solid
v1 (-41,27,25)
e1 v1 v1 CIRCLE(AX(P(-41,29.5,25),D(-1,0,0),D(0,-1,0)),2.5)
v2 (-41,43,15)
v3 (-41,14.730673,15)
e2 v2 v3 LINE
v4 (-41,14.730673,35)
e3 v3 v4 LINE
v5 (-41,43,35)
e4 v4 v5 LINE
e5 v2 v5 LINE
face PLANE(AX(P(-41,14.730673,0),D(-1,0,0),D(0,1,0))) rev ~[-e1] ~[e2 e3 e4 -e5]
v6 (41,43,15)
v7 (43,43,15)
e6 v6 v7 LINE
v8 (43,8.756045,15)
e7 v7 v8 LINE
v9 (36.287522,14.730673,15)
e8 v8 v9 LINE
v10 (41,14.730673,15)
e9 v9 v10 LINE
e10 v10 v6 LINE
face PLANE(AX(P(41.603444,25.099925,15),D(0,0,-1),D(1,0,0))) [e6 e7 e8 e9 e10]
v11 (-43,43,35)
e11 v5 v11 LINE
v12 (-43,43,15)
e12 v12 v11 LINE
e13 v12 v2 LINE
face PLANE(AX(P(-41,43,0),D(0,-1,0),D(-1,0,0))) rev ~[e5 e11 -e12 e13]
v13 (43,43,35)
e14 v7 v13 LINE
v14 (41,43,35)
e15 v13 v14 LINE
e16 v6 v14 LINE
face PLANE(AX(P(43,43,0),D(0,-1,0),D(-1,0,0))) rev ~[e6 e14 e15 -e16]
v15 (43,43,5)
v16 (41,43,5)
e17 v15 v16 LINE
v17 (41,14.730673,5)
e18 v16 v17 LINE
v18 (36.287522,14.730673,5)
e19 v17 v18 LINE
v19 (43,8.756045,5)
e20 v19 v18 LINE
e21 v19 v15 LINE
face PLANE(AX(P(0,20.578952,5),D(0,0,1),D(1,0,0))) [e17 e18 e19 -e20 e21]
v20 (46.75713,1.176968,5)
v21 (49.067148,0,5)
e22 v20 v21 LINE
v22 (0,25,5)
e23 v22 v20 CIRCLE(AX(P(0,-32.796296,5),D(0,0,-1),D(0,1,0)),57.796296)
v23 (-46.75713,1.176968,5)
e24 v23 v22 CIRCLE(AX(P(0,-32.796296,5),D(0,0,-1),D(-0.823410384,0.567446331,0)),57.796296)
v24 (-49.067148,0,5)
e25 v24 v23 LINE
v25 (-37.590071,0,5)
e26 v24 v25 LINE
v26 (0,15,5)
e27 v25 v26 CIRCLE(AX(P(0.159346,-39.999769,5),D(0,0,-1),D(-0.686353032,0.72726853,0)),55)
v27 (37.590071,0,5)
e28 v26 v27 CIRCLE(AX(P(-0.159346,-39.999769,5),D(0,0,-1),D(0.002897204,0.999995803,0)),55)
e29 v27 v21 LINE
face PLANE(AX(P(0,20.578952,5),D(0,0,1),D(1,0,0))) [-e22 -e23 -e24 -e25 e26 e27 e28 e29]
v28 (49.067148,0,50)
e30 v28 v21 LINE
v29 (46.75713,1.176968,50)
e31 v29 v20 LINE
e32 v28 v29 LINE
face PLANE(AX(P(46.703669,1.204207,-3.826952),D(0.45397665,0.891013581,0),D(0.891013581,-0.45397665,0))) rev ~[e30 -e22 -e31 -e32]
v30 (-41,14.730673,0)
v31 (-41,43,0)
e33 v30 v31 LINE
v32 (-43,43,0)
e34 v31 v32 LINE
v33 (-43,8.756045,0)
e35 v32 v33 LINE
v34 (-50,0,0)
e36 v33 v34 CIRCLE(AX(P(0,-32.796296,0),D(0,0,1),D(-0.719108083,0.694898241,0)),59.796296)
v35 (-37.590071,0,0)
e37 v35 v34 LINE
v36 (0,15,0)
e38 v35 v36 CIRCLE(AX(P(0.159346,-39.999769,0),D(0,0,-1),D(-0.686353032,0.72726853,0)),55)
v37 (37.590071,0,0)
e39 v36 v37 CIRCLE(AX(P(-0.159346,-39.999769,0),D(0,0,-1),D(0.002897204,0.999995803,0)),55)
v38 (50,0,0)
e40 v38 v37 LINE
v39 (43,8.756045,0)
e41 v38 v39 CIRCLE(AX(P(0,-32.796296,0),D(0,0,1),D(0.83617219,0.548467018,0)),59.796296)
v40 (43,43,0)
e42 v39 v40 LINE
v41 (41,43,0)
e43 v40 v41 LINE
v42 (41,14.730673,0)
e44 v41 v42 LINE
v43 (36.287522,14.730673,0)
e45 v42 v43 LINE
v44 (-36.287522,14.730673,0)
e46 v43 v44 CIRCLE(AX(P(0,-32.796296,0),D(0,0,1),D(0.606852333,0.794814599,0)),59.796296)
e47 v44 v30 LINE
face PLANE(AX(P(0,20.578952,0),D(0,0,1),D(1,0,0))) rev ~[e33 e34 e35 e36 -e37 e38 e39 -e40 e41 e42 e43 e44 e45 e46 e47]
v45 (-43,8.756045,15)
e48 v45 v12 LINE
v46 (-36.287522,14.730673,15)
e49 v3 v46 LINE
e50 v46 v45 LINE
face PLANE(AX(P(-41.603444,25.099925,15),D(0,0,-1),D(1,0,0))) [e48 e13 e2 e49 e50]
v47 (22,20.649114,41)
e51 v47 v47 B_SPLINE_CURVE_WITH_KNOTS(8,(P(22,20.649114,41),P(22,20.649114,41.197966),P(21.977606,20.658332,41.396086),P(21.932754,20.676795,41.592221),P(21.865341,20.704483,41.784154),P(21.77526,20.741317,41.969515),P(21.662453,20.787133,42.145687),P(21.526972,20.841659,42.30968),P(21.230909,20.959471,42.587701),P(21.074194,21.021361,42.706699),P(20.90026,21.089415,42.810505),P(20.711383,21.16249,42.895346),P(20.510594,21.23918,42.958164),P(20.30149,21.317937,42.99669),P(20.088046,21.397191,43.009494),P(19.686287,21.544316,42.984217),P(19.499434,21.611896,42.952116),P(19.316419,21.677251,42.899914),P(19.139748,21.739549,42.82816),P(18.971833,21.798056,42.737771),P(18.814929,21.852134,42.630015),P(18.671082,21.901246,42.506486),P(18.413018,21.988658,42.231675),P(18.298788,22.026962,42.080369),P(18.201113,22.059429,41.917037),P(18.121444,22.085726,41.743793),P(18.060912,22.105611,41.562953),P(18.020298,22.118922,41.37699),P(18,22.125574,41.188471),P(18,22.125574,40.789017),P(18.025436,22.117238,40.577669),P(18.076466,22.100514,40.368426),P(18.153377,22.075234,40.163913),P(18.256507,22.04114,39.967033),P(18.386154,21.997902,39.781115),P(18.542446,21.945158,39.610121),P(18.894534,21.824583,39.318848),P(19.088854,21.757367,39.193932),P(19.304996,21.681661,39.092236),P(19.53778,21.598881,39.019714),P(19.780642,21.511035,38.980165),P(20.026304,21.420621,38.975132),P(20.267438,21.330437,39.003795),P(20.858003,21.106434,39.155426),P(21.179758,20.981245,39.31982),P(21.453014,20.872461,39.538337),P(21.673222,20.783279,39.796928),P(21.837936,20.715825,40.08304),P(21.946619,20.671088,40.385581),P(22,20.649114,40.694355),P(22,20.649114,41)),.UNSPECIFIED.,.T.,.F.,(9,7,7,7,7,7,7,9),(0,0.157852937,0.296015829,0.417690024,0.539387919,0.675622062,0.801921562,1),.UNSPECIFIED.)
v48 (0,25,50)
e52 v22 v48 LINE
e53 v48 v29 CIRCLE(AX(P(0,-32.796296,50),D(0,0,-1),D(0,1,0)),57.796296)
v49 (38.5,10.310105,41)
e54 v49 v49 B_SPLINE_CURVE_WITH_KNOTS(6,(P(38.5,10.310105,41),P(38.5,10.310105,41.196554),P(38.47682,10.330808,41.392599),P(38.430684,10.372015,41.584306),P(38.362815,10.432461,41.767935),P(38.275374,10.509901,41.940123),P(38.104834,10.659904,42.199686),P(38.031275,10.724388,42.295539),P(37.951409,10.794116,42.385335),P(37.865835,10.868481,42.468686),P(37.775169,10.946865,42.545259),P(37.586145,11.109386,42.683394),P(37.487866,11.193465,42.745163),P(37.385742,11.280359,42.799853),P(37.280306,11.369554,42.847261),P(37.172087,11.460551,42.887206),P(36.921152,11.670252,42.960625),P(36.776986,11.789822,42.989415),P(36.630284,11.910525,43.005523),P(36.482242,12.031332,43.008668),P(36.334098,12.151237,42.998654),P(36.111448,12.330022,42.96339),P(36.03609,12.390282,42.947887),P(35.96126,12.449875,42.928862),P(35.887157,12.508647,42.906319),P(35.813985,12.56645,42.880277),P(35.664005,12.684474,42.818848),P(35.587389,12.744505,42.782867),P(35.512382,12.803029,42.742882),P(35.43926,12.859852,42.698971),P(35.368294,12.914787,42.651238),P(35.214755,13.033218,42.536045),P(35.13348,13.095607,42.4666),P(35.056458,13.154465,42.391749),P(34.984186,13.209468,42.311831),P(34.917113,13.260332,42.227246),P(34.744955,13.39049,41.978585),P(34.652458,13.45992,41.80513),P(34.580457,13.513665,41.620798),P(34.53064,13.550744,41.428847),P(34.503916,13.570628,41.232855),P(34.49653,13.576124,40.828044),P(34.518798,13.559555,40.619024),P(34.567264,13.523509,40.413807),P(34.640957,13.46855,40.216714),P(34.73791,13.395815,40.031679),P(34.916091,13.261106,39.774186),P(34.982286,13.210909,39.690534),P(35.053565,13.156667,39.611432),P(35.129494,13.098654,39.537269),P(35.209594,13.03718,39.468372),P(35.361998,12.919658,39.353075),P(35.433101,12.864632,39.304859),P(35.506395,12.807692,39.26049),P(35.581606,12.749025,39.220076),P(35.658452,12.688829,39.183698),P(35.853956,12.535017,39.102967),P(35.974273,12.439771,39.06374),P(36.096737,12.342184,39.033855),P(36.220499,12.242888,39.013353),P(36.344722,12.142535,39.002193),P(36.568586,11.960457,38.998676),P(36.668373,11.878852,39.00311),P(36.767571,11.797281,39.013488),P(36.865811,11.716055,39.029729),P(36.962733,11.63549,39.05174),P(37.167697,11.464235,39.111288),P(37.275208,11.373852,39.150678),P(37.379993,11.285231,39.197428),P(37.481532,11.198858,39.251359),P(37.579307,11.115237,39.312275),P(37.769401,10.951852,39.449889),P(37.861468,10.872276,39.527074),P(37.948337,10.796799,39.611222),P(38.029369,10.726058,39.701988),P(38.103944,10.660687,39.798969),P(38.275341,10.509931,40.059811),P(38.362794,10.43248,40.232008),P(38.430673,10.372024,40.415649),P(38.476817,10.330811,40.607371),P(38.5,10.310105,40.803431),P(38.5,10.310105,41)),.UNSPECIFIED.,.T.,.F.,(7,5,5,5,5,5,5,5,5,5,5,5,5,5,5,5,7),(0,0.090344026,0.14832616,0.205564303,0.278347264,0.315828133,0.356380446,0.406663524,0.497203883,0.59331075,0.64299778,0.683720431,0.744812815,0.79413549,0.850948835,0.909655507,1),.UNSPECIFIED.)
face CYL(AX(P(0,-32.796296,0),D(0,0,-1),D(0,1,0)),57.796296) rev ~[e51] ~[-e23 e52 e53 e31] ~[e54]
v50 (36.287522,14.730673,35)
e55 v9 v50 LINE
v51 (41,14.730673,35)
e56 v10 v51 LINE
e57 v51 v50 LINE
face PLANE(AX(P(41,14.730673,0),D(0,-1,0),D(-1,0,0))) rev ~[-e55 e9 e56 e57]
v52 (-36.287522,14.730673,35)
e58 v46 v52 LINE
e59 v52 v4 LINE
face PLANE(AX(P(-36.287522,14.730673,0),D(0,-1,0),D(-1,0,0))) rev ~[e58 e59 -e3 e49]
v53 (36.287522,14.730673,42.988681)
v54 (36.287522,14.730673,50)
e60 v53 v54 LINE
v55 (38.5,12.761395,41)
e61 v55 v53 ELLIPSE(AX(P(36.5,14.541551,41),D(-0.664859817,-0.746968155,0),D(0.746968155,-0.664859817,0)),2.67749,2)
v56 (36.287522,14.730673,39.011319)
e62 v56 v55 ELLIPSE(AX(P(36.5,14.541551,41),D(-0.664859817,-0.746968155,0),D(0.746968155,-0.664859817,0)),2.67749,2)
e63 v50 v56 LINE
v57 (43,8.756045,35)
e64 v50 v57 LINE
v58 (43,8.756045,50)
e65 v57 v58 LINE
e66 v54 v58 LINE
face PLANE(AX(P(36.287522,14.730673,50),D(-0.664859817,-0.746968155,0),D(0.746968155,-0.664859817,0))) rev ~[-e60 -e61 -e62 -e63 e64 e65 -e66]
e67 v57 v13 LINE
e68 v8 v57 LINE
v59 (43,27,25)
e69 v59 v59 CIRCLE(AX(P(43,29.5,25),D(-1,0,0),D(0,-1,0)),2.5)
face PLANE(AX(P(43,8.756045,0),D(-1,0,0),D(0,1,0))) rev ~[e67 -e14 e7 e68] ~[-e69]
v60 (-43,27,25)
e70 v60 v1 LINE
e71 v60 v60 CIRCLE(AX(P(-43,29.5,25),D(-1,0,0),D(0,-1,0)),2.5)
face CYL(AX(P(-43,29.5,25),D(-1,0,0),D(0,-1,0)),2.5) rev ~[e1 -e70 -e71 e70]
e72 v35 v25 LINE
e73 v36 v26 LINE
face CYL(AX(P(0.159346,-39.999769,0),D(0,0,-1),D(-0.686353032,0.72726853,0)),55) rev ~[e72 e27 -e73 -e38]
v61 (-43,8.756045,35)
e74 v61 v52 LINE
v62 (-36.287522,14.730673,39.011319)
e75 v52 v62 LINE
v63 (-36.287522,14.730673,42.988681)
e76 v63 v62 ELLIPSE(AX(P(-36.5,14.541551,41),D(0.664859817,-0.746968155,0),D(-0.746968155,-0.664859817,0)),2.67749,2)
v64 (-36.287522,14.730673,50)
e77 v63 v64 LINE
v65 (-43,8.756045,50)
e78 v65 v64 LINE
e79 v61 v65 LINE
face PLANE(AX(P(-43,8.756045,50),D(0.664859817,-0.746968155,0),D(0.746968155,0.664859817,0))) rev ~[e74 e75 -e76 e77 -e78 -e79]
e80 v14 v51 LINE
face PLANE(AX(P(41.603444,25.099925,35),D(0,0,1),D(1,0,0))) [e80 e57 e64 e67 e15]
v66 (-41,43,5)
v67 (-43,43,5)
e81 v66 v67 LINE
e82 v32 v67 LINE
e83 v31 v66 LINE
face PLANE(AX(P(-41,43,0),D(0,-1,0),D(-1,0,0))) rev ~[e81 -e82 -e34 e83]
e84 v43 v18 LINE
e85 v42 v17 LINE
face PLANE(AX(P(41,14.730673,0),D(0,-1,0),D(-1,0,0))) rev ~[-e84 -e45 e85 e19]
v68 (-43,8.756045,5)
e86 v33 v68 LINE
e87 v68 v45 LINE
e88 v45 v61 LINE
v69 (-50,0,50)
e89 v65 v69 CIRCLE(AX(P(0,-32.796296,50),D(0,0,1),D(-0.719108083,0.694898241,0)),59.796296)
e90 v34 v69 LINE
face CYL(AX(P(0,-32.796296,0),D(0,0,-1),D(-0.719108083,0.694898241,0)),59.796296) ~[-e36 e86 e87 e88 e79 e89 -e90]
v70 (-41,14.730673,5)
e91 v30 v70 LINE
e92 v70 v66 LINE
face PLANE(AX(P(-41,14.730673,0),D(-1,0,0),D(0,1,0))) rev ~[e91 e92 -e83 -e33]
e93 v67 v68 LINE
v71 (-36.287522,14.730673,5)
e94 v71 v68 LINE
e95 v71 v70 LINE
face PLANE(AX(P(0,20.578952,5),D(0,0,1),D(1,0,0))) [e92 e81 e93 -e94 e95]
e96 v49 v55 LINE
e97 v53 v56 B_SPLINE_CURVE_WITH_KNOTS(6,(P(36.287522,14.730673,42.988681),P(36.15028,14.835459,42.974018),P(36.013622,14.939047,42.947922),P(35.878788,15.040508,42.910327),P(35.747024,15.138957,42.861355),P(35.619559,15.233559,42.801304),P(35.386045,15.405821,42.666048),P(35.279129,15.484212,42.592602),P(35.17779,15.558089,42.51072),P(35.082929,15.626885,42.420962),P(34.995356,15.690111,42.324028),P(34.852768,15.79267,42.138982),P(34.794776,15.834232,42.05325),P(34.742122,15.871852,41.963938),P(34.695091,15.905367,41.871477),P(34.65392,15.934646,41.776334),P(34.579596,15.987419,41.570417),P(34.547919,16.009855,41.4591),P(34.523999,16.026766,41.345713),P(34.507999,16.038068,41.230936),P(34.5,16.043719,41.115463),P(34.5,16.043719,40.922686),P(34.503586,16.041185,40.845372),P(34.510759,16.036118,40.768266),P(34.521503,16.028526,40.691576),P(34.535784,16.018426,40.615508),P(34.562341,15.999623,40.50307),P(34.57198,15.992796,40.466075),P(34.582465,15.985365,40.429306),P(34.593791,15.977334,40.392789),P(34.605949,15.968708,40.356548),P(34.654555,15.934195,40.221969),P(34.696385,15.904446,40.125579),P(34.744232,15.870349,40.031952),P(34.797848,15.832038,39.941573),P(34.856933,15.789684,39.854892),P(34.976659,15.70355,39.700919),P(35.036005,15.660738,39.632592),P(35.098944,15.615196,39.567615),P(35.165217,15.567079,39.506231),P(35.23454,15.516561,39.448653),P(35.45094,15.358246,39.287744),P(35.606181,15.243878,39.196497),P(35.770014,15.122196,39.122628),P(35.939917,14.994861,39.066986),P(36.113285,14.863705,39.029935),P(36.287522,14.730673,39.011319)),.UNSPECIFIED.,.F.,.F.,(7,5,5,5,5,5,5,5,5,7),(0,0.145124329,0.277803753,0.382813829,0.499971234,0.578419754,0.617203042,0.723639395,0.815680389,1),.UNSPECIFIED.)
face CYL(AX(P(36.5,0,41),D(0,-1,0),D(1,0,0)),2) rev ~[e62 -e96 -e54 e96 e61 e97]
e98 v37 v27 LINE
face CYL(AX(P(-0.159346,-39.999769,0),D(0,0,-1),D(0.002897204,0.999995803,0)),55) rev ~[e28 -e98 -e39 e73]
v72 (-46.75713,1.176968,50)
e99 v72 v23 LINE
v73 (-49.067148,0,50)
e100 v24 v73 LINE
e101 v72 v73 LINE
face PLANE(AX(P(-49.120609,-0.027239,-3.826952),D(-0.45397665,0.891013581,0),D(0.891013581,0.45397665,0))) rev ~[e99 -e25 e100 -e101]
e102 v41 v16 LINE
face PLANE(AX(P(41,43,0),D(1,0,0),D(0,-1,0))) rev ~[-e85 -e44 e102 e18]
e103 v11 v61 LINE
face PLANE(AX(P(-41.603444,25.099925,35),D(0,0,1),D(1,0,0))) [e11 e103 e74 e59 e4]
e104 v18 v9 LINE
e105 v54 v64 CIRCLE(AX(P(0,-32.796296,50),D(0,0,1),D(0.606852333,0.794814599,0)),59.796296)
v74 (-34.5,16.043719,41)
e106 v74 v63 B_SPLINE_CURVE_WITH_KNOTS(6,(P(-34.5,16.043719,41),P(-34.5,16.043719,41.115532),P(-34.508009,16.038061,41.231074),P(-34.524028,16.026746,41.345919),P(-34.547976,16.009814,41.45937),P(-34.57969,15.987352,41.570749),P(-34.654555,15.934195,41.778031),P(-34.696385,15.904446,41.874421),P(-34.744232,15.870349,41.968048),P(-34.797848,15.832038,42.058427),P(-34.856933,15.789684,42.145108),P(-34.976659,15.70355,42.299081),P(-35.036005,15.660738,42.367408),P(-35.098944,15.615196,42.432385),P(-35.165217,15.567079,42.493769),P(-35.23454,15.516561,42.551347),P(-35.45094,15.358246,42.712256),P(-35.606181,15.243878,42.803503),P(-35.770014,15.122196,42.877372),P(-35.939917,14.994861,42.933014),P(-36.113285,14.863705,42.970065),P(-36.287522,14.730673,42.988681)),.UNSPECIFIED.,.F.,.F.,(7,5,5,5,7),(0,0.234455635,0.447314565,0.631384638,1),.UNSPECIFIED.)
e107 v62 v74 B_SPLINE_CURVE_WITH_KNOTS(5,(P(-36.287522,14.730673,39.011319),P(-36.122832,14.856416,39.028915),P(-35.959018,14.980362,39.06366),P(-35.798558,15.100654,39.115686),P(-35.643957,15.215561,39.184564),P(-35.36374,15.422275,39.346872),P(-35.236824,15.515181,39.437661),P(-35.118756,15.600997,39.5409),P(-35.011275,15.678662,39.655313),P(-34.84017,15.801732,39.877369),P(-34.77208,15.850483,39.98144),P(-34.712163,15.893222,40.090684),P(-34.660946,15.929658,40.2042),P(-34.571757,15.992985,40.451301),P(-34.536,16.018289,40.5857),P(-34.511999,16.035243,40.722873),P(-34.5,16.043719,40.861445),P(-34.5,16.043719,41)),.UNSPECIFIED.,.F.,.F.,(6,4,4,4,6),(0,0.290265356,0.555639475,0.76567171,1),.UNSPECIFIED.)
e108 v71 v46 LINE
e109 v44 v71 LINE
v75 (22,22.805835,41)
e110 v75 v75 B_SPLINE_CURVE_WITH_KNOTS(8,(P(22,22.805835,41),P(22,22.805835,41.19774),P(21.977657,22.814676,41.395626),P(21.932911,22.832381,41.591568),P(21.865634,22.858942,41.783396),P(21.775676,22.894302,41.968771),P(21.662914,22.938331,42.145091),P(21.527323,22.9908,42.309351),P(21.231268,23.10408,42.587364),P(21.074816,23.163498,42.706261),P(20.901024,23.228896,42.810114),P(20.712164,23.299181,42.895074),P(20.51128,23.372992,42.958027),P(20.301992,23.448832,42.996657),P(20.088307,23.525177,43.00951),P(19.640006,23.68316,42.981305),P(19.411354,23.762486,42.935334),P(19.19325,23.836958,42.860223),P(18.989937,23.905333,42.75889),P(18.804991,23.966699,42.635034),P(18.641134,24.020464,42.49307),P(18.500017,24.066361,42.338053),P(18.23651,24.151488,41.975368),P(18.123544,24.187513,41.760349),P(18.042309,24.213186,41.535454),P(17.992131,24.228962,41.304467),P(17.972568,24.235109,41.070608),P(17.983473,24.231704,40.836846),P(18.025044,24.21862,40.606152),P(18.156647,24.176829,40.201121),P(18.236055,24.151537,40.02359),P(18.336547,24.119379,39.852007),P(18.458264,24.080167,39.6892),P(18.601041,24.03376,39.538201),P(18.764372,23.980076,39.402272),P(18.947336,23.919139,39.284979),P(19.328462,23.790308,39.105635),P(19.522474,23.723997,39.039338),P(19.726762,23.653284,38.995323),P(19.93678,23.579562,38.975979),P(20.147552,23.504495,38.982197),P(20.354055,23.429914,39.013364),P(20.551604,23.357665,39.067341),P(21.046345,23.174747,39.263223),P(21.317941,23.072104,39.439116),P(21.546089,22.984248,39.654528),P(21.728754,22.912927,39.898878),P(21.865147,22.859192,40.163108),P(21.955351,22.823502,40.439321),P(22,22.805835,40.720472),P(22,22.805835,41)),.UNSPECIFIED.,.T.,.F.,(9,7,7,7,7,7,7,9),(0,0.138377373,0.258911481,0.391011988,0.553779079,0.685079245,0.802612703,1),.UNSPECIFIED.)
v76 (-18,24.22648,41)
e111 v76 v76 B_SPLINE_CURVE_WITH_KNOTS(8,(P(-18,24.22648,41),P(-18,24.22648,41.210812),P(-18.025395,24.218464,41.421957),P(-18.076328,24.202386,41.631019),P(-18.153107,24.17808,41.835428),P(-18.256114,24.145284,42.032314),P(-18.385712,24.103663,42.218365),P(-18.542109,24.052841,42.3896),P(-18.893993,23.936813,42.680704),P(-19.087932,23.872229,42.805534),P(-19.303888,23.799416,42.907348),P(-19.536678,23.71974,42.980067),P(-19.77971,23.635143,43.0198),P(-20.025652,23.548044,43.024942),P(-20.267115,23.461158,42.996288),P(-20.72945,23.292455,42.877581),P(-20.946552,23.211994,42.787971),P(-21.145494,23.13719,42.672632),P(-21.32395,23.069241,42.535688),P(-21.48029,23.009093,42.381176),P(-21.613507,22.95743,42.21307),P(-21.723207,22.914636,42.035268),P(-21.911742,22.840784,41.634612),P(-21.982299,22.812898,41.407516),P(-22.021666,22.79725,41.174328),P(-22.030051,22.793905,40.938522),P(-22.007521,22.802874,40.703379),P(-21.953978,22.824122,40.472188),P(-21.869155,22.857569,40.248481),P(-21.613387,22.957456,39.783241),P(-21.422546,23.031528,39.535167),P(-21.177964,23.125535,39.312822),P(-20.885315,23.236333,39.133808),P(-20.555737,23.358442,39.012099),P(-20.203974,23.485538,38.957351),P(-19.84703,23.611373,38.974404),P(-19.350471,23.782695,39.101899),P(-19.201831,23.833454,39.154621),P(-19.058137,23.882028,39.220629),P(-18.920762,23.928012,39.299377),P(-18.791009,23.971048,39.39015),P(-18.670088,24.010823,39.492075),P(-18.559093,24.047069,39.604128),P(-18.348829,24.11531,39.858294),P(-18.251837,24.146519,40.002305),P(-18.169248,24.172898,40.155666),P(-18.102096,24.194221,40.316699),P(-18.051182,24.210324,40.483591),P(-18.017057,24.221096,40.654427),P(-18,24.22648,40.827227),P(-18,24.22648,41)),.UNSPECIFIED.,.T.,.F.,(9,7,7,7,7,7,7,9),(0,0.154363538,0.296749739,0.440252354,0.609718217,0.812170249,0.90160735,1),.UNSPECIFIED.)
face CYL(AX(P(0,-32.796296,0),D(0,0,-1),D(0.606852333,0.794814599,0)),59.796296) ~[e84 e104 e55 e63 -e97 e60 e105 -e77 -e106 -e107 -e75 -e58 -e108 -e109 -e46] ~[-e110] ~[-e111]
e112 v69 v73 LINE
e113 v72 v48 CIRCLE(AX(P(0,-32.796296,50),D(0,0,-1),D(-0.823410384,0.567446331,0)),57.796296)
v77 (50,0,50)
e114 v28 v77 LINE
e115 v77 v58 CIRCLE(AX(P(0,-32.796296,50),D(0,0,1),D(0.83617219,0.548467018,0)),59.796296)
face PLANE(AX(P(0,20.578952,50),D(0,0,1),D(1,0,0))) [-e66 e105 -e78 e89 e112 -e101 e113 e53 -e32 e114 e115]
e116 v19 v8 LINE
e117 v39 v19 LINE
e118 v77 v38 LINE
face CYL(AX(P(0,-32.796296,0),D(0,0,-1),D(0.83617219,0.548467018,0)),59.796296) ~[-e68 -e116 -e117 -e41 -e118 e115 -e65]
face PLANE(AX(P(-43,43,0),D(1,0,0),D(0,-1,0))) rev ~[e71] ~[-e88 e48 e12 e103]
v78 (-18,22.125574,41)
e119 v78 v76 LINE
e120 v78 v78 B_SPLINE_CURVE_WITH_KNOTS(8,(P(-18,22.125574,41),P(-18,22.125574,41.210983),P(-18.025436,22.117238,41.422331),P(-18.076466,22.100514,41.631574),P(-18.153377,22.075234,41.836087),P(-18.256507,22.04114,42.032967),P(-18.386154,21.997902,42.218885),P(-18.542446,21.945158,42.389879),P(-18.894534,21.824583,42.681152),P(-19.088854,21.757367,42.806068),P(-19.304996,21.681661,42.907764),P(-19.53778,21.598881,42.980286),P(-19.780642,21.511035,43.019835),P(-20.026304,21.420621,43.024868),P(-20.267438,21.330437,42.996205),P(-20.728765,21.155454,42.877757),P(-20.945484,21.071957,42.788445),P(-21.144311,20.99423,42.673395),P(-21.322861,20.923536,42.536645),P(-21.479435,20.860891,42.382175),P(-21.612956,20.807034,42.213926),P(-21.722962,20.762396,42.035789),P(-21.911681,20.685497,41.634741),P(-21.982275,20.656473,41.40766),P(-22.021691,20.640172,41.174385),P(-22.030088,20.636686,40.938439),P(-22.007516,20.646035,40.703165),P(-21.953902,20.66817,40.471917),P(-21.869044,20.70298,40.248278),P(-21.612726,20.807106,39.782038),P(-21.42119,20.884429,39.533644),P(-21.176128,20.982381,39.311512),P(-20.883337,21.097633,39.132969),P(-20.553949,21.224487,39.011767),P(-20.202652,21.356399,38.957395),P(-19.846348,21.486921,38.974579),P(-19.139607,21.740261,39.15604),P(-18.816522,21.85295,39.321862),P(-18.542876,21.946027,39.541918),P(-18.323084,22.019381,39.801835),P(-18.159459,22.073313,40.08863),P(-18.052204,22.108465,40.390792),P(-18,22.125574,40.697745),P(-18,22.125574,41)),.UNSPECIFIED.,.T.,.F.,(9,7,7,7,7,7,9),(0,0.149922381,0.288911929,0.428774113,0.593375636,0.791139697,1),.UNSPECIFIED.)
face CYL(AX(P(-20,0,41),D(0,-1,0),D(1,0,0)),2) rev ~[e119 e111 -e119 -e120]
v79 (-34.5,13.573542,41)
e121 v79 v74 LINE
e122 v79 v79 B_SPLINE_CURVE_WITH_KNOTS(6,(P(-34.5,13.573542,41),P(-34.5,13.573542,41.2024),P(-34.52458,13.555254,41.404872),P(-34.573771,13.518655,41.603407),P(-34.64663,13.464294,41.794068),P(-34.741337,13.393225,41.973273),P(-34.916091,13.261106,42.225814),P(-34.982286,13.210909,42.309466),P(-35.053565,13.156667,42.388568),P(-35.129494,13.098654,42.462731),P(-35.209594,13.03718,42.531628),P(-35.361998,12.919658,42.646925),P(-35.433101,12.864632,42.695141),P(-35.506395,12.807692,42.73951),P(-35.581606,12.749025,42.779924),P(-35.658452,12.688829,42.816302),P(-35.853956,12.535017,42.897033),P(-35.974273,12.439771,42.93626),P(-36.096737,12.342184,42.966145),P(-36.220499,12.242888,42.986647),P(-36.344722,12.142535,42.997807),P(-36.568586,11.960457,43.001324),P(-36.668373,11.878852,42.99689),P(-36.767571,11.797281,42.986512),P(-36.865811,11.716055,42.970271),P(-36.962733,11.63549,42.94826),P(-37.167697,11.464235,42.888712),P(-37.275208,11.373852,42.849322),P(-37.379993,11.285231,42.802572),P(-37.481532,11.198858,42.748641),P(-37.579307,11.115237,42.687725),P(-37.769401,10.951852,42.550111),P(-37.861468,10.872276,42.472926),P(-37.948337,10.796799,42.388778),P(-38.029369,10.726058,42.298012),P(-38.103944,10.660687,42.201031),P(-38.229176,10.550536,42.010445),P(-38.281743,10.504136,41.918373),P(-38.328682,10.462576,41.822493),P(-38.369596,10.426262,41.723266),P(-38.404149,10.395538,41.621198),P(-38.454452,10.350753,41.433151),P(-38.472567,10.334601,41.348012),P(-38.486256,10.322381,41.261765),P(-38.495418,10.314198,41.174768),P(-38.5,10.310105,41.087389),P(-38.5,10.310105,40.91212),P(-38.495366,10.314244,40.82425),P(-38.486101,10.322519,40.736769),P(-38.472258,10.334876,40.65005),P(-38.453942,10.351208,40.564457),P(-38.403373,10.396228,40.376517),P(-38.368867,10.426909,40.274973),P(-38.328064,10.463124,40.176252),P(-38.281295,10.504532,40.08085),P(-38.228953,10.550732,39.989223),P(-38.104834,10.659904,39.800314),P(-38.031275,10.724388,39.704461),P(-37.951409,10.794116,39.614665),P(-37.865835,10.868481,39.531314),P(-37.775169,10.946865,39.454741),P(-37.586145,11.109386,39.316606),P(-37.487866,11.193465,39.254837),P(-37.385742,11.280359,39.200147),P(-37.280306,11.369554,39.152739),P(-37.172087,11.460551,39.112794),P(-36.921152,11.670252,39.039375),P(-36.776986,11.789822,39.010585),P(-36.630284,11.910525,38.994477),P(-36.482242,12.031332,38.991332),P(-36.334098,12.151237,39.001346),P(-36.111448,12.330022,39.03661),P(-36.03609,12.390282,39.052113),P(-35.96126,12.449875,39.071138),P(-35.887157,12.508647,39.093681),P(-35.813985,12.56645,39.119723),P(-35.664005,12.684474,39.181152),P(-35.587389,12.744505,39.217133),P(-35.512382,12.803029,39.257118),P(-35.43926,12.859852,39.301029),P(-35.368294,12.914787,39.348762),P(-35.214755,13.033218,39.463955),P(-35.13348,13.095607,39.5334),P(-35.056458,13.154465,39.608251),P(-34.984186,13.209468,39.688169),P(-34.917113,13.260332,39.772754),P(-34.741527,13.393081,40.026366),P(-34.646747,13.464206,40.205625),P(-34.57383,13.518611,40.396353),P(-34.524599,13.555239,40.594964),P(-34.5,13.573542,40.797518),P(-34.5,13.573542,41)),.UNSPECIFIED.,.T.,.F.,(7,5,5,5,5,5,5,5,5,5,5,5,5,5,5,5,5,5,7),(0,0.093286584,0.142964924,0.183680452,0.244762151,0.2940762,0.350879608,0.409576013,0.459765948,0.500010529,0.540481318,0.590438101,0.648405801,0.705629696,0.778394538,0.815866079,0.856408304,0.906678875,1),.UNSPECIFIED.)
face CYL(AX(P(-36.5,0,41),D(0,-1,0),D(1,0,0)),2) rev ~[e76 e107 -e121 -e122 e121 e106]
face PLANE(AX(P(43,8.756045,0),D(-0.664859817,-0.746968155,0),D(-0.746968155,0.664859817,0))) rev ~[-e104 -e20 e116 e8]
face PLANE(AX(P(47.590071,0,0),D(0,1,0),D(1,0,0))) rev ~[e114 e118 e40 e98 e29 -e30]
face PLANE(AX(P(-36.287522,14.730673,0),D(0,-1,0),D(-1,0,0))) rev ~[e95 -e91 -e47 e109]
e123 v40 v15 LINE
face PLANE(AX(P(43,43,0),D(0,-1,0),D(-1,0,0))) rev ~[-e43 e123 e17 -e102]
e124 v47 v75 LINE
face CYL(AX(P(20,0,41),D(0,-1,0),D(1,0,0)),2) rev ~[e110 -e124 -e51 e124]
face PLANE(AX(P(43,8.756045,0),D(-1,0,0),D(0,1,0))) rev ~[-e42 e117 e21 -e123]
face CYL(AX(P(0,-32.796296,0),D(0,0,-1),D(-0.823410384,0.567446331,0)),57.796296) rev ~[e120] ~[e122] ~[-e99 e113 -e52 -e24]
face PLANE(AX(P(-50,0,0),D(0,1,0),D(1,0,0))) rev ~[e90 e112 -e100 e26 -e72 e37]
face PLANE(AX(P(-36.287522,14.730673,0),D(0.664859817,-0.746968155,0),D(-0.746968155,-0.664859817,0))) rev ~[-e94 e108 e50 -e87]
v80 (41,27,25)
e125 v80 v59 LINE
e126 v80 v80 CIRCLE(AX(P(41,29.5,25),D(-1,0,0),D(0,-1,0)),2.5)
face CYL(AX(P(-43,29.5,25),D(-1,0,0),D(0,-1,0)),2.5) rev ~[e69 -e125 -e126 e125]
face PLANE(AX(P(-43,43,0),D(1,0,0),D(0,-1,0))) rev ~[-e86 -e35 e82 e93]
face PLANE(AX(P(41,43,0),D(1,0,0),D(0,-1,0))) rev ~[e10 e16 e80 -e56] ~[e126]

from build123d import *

# Parameters (mm, degrees)
F1_DEPTH    = 50
F3_DEPTH    = 15
F5_DEPTH    = 15
F6_R        = 2.5
F7_DEPTH    = 93.001
F8_T1_DEPTH = 57.6539038248
F9_DEPTH    = 5
F10_R       = 2
F11_DEPTH   = 33


# Not quite as in the source:
# - a fillet or chamfer that OpenCascade refuses, or shapes differently, is made with other operations: its cross-section is extruded or revolved along the edge and cut away or added


with BuildPart() as f1:
    # F0 (on Top) → F1 (new body)
    with BuildSketch(Plane.XY):
        with BuildLine():
            ThreePointArc((-43, 8.7560448021), (-46.7056429154, 4.5424231597), (-50, 0))
            Line((-50, 0), (-47.5900705485, 0))
            ThreePointArc((-47.5900705485, 0), (-26.8784989109, 18.3696900801), (0, 25))
            ThreePointArc((0, 25), (26.8784989109, 18.3696900801), (47.5900705485, 0))
            Line((47.5900705485, 0), (50, 0))
            ThreePointArc((50, 0), (46.7056429154, 4.5424231597), (43, 8.7560448021))
            Line((43, 8.7560448021), (43, 43))
            Line((43, 43), (41, 43))
            Line((41, 43), (41, 14.7306729384))
            Line((41, 14.7306729384), (36.2875219066, 14.7306729384))
            ThreePointArc((36.2875219066, 14.7306729384), (0, 27), (-36.2875219066, 14.7306729384))
            Line((-36.2875219066, 14.7306729384), (-41, 14.7306729384))
            Line((-41, 14.7306729384), (-41, 43))
            Line((-41, 43), (-43, 43))
            Line((-43, 43), (-43, 8.7560448021))
        make_face()
    extrude(amount=F1_DEPTH)

    # F2 (on face) → F3 (cut)
    with BuildSketch(Plane.XY.offset(50)):
        Polygon((-43, 8.7560448021), (-36.2875219066, 14.7306729384), (-41, 14.7306729384), (-41, 43), (-43, 43), align=None)
        Polygon((41, 43), (41, 14.7306729384), (36.2875219066, 14.7306729384), (43, 8.7560448021), (43, 43), align=None)
    extrude(amount=-F3_DEPTH, mode=Mode.SUBTRACT)

    # F4 (on face) → F5 (cut)
    with BuildSketch(Plane(origin=(0, 0, 0), x_dir=(1, 0, 0), z_dir=(0, 0, -1))):
        Polygon((-36.2875219066, -14.7306729384), (-43, -8.7560448021), (-43, -43), (-41, -43), (-41, -14.7306729384), align=None)
        Polygon((43, -8.7560448021), (36.2875219066, -14.7306729384), (41, -14.7306729384), (41, -43), (43, -43), align=None)
    extrude(amount=-F5_DEPTH, mode=Mode.SUBTRACT)

    # F6 (on face) → F7 (cut, through all)
    with BuildSketch(Plane(origin=(-43, 0, 0), x_dir=(0, -1, 0), z_dir=(-1, 0, 0))):
        with Locations((-29.5, 25)):
            Circle(F6_R)
    extrude(amount=-F7_DEPTH, mode=Mode.SUBTRACT)

    # F8: chamfer of 1.5 on 2 edges, made by hand

    # F8_s2 → F8_t1 (cut)
    with BuildSketch(Plane.XY.offset(-3.8269519124)):
        with BuildLine():
            Line((-49.1206089535, -0.027238599), (-46.7036689522, 1.2042065191))
            Line((-46.7036689522, 1.2042065191), (-46.6793989906, 1.186572207))
            ThreePointArc((-46.6793989906, 1.186572207), (-47.1374385844, 0.5954223102), (-47.565368237, -0.0170233899))
            Line((-47.565368237, -0.0170233899), (-47.5900705485, -0.03))
            ThreePointArc((-47.5900705485, -0.03), (-48.355339751, -0.03), (-49.1206089535, -0.057238599))
            Line((-49.1206089535, -0.057238599), (-49.1206089535, -0.027238599))
        make_face()
        with BuildLine():
            Line((46.7036689522, 1.2042065191), (49.1206089535, -0.027238599))
            Line((49.1206089535, -0.027238599), (49.1206089535, -0.057238599))
            ThreePointArc((49.1206089535, -0.057238599), (48.355339751, -0.03), (47.5900705485, -0.03))
            Line((47.5900705485, -0.03), (47.565368237, -0.0170233899))
            ThreePointArc((47.565368237, -0.0170233899), (47.1374385844, 0.5954223102), (46.6793989906, 1.186572207))
            Line((46.6793989906, 1.186572207), (46.7036689522, 1.2042065191))
        make_face()
    extrude(amount=F8_T1_DEPTH, mode=Mode.SUBTRACT)

    # F0 (on Top) → F9 (join)
    with BuildSketch(Plane.XY):
        with BuildLine():
            ThreePointArc((-43, 8.7560448021), (-46.7056429154, 4.5424231597), (-50, 0))
            Line((-50, 0), (-47.5900705485, 0))
            ThreePointArc((-47.5900705485, 0), (-26.8784989109, 18.3696900801), (0, 25))
            ThreePointArc((0, 25), (26.8784989109, 18.3696900801), (47.5900705485, 0))
            Line((47.5900705485, 0), (50, 0))
            ThreePointArc((50, 0), (46.7056429154, 4.5424231597), (43, 8.7560448021))
            Line((43, 8.7560448021), (43, 43))
            Line((43, 43), (41, 43))
            Line((41, 43), (41, 14.7306729384))
            Line((41, 14.7306729384), (36.2875219066, 14.7306729384))
            ThreePointArc((36.2875219066, 14.7306729384), (0, 27), (-36.2875219066, 14.7306729384))
            Line((-36.2875219066, 14.7306729384), (-41, 14.7306729384))
            Line((-41, 14.7306729384), (-41, 43))
            Line((-41, 43), (-43, 43))
            Line((-43, 43), (-43, 8.7560448021))
        make_face()
        with BuildLine():
            ThreePointArc((0, 25), (-26.8784989109, 18.3696900801), (-47.5900705485, 0))
            Line((-47.5900705485, 0), (-37.5900705485, 0))
            ThreePointArc((-37.5900705485, 0), (-20.2249265861, 11.0833143525), (0, 15))
            Line((0, 15), (0, 25))
        make_face()
        with BuildLine():
            ThreePointArc((47.5900705485, 0), (26.8784989109, 18.3696900801), (0, 25))
            Line((0, 25), (0, 15))
            ThreePointArc((0, 15), (20.2249265861, 11.0833143525), (37.5900705485, 0))
            Line((37.5900705485, 0), (47.5900705485, 0))
        make_face()
    extrude(amount=F9_DEPTH)

    # F10 (on Front) → F11 (cut)
    with BuildSketch(Plane.XZ):
        with Locations((-36.5, 41)):
            Circle(F10_R)
        with Locations((-20, 41)):
            Circle(F10_R)
        with Locations((20, 41)):
            Circle(F10_R)
        with Locations((36.5, 41)):
            Circle(F10_R)
    extrude(amount=-F11_DEPTH, mode=Mode.SUBTRACT)


solid = f1.part
